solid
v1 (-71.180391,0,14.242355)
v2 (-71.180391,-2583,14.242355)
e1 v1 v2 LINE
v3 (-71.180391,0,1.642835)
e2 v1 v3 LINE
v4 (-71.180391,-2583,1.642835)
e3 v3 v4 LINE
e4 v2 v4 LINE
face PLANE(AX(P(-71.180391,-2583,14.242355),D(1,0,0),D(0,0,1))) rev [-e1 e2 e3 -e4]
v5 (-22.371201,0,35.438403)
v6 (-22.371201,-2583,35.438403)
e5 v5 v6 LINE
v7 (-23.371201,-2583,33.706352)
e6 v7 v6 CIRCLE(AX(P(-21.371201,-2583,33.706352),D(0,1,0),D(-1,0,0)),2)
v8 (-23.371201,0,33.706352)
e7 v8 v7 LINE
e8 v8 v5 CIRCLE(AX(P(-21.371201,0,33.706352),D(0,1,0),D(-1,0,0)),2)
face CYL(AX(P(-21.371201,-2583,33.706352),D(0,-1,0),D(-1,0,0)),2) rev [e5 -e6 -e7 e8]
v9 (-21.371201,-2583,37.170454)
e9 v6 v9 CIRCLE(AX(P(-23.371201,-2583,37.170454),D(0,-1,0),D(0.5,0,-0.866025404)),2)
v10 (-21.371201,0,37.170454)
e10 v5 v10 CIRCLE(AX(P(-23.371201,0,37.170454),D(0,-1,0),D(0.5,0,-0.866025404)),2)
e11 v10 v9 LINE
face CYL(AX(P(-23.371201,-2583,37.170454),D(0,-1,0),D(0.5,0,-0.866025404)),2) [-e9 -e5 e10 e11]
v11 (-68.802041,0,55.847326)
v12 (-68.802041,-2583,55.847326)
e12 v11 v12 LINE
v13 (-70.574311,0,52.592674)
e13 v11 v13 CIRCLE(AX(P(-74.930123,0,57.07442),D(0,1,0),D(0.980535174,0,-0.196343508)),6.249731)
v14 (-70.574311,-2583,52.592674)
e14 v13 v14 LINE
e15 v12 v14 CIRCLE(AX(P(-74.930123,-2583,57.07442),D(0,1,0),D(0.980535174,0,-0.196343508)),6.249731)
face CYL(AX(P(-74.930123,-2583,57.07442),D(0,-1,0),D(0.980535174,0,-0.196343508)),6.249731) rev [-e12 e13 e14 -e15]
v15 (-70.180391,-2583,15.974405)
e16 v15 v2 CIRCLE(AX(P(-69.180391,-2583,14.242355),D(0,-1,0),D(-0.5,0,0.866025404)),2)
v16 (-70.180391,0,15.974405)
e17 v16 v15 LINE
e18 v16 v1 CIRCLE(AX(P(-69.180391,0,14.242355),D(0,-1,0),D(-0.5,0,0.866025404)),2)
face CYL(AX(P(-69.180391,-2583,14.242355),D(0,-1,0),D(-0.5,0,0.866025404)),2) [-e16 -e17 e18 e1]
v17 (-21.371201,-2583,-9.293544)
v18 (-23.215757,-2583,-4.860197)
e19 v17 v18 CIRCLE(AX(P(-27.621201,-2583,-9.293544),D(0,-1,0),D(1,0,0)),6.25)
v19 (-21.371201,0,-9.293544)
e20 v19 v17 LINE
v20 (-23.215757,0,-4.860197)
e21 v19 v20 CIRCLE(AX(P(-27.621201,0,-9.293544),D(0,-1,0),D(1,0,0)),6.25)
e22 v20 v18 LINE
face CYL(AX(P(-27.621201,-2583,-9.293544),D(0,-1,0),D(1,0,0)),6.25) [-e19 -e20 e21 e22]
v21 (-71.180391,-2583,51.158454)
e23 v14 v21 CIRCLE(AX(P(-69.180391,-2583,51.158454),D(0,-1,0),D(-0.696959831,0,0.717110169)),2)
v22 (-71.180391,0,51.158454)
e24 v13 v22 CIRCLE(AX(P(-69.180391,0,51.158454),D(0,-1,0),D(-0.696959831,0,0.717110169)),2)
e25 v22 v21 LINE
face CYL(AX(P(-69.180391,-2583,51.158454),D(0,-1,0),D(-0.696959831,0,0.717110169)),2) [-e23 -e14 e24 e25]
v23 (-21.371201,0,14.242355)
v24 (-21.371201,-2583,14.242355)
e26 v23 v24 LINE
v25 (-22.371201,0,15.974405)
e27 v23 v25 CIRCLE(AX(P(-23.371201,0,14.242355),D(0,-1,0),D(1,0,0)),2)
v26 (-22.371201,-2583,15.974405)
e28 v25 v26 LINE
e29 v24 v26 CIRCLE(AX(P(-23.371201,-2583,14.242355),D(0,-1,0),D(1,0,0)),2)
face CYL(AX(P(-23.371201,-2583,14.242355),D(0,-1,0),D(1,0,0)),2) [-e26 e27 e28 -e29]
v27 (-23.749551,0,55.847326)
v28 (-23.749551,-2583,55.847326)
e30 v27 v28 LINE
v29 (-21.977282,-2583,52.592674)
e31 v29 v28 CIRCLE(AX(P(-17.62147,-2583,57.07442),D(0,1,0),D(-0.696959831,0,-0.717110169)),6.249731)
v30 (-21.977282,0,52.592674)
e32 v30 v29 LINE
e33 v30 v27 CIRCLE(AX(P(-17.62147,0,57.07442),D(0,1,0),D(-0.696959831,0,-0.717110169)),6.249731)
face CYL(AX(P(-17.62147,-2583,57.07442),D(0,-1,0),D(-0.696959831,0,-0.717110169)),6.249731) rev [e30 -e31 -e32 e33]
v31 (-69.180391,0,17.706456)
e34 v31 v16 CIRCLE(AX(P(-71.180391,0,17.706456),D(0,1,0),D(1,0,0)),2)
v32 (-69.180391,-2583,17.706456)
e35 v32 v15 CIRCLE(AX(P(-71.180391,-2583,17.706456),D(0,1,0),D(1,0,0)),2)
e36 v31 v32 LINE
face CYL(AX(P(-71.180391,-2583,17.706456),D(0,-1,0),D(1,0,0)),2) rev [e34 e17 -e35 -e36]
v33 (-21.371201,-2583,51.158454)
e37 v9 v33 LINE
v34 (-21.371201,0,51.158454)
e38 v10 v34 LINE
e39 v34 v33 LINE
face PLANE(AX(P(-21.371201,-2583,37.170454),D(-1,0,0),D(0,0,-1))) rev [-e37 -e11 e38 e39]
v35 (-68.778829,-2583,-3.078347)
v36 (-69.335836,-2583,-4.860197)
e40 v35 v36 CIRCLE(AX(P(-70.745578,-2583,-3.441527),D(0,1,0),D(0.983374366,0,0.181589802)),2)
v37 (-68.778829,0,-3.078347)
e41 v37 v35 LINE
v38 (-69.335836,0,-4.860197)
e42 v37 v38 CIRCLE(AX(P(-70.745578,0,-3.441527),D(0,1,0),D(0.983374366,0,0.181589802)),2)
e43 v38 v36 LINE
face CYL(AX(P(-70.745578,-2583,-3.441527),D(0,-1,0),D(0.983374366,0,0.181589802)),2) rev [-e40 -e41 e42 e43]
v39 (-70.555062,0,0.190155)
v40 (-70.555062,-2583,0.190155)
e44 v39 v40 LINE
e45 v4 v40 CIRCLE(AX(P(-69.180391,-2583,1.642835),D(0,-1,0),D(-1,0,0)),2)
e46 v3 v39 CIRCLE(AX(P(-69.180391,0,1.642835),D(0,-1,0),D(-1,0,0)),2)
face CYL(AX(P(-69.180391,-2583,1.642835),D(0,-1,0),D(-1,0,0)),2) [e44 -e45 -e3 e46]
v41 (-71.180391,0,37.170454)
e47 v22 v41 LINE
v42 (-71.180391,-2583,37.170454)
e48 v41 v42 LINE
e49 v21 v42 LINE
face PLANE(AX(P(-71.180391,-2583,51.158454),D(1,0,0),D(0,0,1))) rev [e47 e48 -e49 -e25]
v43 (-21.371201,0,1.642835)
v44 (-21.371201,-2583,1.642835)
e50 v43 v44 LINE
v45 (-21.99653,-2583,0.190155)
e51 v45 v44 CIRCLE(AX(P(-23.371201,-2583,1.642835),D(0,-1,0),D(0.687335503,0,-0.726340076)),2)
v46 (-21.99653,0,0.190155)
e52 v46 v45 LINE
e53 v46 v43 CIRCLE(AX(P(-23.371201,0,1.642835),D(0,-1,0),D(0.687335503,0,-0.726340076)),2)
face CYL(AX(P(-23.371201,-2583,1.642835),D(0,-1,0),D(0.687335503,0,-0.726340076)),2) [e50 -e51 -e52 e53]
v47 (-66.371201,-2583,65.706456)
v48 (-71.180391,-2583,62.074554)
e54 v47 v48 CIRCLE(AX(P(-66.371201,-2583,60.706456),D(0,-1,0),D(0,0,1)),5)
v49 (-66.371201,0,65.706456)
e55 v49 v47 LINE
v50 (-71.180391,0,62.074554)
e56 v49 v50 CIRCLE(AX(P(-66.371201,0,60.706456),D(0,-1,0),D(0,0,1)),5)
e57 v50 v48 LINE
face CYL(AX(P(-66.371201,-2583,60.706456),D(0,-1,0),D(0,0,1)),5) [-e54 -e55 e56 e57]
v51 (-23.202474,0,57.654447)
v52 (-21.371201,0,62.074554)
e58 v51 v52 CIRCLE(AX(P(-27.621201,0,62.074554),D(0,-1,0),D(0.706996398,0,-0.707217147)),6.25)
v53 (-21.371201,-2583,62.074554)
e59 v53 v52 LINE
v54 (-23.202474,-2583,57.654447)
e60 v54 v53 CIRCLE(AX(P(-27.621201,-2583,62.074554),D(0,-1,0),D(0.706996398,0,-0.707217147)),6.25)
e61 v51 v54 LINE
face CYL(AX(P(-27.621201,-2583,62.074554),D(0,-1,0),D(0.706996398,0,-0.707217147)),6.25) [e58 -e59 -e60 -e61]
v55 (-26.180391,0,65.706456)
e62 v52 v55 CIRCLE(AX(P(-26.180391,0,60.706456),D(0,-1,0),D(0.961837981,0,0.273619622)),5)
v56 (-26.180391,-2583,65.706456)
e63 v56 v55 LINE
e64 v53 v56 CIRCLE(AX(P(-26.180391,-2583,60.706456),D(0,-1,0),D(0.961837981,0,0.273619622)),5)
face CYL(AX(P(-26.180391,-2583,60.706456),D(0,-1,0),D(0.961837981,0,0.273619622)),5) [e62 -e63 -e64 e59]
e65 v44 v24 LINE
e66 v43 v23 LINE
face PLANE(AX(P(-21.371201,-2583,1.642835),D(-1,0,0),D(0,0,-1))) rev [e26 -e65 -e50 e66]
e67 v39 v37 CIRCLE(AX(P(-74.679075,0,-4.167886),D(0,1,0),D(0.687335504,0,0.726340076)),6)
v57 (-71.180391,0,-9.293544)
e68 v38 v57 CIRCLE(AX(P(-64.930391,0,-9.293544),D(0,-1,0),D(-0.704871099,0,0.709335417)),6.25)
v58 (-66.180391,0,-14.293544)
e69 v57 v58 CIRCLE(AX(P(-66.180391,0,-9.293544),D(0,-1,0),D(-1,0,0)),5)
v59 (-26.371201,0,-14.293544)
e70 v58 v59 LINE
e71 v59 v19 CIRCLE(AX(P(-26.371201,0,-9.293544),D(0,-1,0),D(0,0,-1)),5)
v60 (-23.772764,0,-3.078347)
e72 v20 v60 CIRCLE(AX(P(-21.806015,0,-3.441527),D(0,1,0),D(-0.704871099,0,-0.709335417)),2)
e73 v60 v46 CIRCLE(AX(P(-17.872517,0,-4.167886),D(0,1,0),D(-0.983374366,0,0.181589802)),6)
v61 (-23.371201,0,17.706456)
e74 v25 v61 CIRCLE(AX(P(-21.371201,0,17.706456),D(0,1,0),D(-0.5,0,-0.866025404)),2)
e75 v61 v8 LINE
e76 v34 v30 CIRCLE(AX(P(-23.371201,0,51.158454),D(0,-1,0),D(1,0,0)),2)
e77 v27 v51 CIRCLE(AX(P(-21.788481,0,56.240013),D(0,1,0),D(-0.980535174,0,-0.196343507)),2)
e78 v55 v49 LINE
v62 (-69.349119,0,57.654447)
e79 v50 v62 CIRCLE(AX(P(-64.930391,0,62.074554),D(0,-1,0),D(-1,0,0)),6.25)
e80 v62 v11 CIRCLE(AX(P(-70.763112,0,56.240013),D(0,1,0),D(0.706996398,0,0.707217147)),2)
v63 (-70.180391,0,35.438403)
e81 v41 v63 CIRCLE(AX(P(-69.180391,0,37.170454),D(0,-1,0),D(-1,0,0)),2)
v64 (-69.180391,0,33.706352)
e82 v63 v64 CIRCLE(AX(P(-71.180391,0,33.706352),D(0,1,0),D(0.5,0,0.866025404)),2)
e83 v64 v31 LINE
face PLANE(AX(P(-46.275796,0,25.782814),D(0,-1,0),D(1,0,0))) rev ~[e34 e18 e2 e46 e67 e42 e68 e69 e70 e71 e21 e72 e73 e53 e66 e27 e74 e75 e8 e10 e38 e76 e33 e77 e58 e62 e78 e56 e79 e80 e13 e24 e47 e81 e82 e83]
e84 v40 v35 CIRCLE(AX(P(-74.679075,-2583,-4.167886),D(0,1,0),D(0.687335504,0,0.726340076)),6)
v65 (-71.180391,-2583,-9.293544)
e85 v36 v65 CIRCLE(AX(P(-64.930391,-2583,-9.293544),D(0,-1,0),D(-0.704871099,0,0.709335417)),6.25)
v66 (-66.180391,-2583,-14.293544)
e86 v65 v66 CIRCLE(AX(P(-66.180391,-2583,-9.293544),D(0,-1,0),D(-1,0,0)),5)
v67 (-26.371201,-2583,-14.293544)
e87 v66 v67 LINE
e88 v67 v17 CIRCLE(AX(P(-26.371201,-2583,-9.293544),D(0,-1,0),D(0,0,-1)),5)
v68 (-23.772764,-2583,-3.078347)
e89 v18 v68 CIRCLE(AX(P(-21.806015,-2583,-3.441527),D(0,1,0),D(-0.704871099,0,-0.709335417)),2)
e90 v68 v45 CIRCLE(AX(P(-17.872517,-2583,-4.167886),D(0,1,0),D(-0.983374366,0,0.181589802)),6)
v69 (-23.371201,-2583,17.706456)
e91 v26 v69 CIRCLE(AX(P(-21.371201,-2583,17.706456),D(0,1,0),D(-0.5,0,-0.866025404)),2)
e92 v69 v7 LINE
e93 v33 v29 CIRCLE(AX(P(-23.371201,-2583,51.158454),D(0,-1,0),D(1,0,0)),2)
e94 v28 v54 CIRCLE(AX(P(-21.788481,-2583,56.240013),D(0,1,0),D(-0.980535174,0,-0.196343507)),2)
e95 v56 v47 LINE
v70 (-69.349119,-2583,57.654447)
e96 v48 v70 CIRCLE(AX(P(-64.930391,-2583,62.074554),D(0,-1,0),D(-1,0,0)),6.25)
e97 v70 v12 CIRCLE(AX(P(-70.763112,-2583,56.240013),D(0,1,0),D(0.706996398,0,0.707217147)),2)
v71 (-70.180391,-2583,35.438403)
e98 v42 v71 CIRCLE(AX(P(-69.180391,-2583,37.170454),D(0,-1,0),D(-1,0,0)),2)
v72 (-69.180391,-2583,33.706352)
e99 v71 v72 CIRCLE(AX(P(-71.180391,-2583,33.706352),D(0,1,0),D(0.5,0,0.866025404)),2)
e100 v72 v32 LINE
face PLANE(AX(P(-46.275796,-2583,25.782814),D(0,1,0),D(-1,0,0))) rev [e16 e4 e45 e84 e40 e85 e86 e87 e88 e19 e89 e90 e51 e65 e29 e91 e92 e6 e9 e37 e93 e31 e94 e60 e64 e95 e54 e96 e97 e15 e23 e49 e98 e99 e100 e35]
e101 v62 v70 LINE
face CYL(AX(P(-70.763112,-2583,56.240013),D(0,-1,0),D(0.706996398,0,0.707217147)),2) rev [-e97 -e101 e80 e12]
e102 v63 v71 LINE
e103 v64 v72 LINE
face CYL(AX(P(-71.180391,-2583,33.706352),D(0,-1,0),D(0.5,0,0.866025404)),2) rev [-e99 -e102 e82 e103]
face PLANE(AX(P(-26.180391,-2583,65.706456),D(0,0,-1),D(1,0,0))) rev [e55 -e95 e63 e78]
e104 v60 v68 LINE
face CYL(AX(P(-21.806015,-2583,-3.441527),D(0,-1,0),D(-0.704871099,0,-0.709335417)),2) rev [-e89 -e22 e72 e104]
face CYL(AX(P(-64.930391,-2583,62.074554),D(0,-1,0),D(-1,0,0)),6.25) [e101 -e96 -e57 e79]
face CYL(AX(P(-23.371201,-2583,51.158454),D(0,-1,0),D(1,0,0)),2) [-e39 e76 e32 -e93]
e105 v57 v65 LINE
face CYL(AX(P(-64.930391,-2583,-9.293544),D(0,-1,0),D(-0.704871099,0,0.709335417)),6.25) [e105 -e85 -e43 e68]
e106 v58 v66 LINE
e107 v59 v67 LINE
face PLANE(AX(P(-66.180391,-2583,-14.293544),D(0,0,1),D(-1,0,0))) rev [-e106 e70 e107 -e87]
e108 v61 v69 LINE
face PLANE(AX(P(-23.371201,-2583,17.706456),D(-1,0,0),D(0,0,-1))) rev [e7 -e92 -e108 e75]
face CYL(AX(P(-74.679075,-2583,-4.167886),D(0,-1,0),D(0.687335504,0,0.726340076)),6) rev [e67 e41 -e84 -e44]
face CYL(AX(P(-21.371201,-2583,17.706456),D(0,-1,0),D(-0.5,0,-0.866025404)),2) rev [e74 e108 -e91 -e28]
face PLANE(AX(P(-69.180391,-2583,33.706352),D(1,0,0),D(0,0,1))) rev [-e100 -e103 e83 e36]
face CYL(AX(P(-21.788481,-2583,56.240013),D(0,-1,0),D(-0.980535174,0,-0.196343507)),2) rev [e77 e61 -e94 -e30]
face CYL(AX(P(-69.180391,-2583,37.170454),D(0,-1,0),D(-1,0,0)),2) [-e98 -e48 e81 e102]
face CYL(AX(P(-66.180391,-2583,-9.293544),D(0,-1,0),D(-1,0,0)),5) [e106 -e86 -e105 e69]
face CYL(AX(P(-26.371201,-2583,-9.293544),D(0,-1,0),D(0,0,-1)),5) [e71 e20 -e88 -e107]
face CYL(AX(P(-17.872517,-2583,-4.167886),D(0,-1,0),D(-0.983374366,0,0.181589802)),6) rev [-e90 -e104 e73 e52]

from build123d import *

# Parameters (mm, degrees)
F1_DEPTH = 1364


# Not quite as in the source:
# - a feature of the source that left no trace in its solid (it failed there, or was rolled back) is left out
# - a pattern or mirror of a feature is missing from the dataset's text; its kind, count and spacing are read off the source's solid


with BuildPart() as f1:
    # F0 (on Front) → F1 (new body)
    with BuildSketch(Plane.XZ):
        with BuildLine():
            Line((-26.1803913116, 65.7064561546), (-66.3712014047, 65.7064561546))
            ThreePointArc((-66.3712014047, 65.7064561546), (-69.3844645404, 64.6964743594), (-71.1803913116, 62.0745542645))
            ThreePointArc((-71.1803913116, 62.0745542645), (-70.7044517023, 59.6823321584), (-69.349118798, 57.6544470937))
            ThreePointArc((-69.349118798, 57.6544470937), (-68.8489055801, 56.8195085607), (-68.802041246, 55.8473257839))
            ThreePointArc((-68.802041246, 55.8473257839), (-69.4413893704, 54.0856160437), (-70.5743109736, 52.592674024))
            ThreePointArc((-70.5743109736, 52.592674024), (-71.0226507022, 51.9369653038), (-71.1803913116, 51.1584536867))
            Line((-71.1803913116, 51.1584536867), (-71.1803913116, 37.1704536867))
            ThreePointArc((-71.1803913116, 37.1704536867), (-70.9124421192, 36.1704536867), (-70.1803913116, 35.4384028791))
            ThreePointArc((-70.1803913116, 35.4384028791), (-69.4483405041, 34.7063520715), (-69.1803913116, 33.7063520715))
            Line((-69.1803913116, 33.7063520715), (-69.1803913116, 17.7064561546))
            ThreePointArc((-69.1803913116, 17.7064561546), (-69.4483405041, 16.7064561546), (-70.1803913116, 15.974405347))
            ThreePointArc((-70.1803913116, 15.974405347), (-70.9124421192, 15.2423545394), (-71.1803913116, 14.2423545394))
            Line((-71.1803913116, 14.2423545394), (-71.1803913116, 1.6428347462))
            ThreePointArc((-71.1803913116, 1.6428347462), (-71.017419076, 0.8520572851), (-70.5550623187, 0.1901545948))
            ThreePointArc((-70.5550623187, 0.1901545948), (-69.4072427397, -1.3029633413), (-68.7788291433, -3.0783470488))
            ThreePointArc((-68.7788291433, -3.0783470488), (-68.8366723002, -4.0382506294), (-69.3358356782, -4.8601974871))
            ThreePointArc((-69.3358356782, -4.8601974871), (-70.7008560802, -6.8926614338), (-71.1803913116, -9.2935438454))
            ThreePointArc((-71.1803913116, -9.2935438454), (-69.7159252176, -12.8290777513), (-66.1803913116, -14.2935438454))
            Line((-66.1803913116, -14.2935438454), (-26.3712014047, -14.2935438454))
            ThreePointArc((-26.3712014047, -14.2935438454), (-22.8356674987, -12.8290777513), (-21.3712014047, -9.2935438454))
            ThreePointArc((-21.3712014047, -9.2935438454), (-21.8507366361, -6.8926614338), (-23.2157570381, -4.8601974871))
            ThreePointArc((-23.2157570381, -4.8601974871), (-23.7149204161, -4.0382506294), (-23.772763573, -3.0783470488))
            ThreePointArc((-23.772763573, -3.0783470488), (-23.1443499766, -1.3029633413), (-21.9965303976, 0.1901545948))
            ThreePointArc((-21.9965303976, 0.1901545948), (-21.5341736403, 0.8520572851), (-21.3712014047, 1.6428347462))
            Line((-21.3712014047, 1.6428347462), (-21.3712014047, 14.2423545394))
            ThreePointArc((-21.3712014047, 14.2423545394), (-21.6391505971, 15.2423545394), (-22.3712014047, 15.974405347))
            ThreePointArc((-22.3712014047, 15.974405347), (-23.1032522122, 16.7064561546), (-23.3712014047, 17.7064561546))
            Line((-23.3712014047, 17.7064561546), (-23.3712014047, 33.7063520715))
            ThreePointArc((-23.3712014047, 33.7063520715), (-23.1032522122, 34.7063520715), (-22.3712014047, 35.4384028791))
            ThreePointArc((-22.3712014047, 35.4384028791), (-21.6391505971, 36.1704536867), (-21.3712014047, 37.1704536867))
            Line((-21.3712014047, 37.1704536867), (-21.3712014047, 51.1584536867))
            ThreePointArc((-21.3712014047, 51.1584536867), (-21.5289420141, 51.9369653038), (-21.9772817427, 52.592674024))
            ThreePointArc((-21.9772817427, 52.592674024), (-23.1102033459, 54.0856160437), (-23.7495514703, 55.8473257839))
            ThreePointArc((-23.7495514703, 55.8473257839), (-23.7026871362, 56.8195085607), (-23.2024739183, 57.6544470937))
            ThreePointArc((-23.2024739183, 57.6544470937), (-21.847141014, 59.6823321584), (-21.3712014047, 62.0745542645))
            ThreePointArc((-21.3712014047, 62.0745542645), (-23.1671281759, 64.6964743594), (-26.1803913116, 65.7064561546))
        make_face()
    extrude(amount=F1_DEPTH)

    # F1_copies: F1 across plane


with BuildPart() as f1_1:
    add(f1.part)
    add(f1.part.mirror(Plane(origin=(0, -1291.5, 0), x_dir=(0, 0, -1), z_dir=(0, -1, 0))))


solid = f1_1.part
